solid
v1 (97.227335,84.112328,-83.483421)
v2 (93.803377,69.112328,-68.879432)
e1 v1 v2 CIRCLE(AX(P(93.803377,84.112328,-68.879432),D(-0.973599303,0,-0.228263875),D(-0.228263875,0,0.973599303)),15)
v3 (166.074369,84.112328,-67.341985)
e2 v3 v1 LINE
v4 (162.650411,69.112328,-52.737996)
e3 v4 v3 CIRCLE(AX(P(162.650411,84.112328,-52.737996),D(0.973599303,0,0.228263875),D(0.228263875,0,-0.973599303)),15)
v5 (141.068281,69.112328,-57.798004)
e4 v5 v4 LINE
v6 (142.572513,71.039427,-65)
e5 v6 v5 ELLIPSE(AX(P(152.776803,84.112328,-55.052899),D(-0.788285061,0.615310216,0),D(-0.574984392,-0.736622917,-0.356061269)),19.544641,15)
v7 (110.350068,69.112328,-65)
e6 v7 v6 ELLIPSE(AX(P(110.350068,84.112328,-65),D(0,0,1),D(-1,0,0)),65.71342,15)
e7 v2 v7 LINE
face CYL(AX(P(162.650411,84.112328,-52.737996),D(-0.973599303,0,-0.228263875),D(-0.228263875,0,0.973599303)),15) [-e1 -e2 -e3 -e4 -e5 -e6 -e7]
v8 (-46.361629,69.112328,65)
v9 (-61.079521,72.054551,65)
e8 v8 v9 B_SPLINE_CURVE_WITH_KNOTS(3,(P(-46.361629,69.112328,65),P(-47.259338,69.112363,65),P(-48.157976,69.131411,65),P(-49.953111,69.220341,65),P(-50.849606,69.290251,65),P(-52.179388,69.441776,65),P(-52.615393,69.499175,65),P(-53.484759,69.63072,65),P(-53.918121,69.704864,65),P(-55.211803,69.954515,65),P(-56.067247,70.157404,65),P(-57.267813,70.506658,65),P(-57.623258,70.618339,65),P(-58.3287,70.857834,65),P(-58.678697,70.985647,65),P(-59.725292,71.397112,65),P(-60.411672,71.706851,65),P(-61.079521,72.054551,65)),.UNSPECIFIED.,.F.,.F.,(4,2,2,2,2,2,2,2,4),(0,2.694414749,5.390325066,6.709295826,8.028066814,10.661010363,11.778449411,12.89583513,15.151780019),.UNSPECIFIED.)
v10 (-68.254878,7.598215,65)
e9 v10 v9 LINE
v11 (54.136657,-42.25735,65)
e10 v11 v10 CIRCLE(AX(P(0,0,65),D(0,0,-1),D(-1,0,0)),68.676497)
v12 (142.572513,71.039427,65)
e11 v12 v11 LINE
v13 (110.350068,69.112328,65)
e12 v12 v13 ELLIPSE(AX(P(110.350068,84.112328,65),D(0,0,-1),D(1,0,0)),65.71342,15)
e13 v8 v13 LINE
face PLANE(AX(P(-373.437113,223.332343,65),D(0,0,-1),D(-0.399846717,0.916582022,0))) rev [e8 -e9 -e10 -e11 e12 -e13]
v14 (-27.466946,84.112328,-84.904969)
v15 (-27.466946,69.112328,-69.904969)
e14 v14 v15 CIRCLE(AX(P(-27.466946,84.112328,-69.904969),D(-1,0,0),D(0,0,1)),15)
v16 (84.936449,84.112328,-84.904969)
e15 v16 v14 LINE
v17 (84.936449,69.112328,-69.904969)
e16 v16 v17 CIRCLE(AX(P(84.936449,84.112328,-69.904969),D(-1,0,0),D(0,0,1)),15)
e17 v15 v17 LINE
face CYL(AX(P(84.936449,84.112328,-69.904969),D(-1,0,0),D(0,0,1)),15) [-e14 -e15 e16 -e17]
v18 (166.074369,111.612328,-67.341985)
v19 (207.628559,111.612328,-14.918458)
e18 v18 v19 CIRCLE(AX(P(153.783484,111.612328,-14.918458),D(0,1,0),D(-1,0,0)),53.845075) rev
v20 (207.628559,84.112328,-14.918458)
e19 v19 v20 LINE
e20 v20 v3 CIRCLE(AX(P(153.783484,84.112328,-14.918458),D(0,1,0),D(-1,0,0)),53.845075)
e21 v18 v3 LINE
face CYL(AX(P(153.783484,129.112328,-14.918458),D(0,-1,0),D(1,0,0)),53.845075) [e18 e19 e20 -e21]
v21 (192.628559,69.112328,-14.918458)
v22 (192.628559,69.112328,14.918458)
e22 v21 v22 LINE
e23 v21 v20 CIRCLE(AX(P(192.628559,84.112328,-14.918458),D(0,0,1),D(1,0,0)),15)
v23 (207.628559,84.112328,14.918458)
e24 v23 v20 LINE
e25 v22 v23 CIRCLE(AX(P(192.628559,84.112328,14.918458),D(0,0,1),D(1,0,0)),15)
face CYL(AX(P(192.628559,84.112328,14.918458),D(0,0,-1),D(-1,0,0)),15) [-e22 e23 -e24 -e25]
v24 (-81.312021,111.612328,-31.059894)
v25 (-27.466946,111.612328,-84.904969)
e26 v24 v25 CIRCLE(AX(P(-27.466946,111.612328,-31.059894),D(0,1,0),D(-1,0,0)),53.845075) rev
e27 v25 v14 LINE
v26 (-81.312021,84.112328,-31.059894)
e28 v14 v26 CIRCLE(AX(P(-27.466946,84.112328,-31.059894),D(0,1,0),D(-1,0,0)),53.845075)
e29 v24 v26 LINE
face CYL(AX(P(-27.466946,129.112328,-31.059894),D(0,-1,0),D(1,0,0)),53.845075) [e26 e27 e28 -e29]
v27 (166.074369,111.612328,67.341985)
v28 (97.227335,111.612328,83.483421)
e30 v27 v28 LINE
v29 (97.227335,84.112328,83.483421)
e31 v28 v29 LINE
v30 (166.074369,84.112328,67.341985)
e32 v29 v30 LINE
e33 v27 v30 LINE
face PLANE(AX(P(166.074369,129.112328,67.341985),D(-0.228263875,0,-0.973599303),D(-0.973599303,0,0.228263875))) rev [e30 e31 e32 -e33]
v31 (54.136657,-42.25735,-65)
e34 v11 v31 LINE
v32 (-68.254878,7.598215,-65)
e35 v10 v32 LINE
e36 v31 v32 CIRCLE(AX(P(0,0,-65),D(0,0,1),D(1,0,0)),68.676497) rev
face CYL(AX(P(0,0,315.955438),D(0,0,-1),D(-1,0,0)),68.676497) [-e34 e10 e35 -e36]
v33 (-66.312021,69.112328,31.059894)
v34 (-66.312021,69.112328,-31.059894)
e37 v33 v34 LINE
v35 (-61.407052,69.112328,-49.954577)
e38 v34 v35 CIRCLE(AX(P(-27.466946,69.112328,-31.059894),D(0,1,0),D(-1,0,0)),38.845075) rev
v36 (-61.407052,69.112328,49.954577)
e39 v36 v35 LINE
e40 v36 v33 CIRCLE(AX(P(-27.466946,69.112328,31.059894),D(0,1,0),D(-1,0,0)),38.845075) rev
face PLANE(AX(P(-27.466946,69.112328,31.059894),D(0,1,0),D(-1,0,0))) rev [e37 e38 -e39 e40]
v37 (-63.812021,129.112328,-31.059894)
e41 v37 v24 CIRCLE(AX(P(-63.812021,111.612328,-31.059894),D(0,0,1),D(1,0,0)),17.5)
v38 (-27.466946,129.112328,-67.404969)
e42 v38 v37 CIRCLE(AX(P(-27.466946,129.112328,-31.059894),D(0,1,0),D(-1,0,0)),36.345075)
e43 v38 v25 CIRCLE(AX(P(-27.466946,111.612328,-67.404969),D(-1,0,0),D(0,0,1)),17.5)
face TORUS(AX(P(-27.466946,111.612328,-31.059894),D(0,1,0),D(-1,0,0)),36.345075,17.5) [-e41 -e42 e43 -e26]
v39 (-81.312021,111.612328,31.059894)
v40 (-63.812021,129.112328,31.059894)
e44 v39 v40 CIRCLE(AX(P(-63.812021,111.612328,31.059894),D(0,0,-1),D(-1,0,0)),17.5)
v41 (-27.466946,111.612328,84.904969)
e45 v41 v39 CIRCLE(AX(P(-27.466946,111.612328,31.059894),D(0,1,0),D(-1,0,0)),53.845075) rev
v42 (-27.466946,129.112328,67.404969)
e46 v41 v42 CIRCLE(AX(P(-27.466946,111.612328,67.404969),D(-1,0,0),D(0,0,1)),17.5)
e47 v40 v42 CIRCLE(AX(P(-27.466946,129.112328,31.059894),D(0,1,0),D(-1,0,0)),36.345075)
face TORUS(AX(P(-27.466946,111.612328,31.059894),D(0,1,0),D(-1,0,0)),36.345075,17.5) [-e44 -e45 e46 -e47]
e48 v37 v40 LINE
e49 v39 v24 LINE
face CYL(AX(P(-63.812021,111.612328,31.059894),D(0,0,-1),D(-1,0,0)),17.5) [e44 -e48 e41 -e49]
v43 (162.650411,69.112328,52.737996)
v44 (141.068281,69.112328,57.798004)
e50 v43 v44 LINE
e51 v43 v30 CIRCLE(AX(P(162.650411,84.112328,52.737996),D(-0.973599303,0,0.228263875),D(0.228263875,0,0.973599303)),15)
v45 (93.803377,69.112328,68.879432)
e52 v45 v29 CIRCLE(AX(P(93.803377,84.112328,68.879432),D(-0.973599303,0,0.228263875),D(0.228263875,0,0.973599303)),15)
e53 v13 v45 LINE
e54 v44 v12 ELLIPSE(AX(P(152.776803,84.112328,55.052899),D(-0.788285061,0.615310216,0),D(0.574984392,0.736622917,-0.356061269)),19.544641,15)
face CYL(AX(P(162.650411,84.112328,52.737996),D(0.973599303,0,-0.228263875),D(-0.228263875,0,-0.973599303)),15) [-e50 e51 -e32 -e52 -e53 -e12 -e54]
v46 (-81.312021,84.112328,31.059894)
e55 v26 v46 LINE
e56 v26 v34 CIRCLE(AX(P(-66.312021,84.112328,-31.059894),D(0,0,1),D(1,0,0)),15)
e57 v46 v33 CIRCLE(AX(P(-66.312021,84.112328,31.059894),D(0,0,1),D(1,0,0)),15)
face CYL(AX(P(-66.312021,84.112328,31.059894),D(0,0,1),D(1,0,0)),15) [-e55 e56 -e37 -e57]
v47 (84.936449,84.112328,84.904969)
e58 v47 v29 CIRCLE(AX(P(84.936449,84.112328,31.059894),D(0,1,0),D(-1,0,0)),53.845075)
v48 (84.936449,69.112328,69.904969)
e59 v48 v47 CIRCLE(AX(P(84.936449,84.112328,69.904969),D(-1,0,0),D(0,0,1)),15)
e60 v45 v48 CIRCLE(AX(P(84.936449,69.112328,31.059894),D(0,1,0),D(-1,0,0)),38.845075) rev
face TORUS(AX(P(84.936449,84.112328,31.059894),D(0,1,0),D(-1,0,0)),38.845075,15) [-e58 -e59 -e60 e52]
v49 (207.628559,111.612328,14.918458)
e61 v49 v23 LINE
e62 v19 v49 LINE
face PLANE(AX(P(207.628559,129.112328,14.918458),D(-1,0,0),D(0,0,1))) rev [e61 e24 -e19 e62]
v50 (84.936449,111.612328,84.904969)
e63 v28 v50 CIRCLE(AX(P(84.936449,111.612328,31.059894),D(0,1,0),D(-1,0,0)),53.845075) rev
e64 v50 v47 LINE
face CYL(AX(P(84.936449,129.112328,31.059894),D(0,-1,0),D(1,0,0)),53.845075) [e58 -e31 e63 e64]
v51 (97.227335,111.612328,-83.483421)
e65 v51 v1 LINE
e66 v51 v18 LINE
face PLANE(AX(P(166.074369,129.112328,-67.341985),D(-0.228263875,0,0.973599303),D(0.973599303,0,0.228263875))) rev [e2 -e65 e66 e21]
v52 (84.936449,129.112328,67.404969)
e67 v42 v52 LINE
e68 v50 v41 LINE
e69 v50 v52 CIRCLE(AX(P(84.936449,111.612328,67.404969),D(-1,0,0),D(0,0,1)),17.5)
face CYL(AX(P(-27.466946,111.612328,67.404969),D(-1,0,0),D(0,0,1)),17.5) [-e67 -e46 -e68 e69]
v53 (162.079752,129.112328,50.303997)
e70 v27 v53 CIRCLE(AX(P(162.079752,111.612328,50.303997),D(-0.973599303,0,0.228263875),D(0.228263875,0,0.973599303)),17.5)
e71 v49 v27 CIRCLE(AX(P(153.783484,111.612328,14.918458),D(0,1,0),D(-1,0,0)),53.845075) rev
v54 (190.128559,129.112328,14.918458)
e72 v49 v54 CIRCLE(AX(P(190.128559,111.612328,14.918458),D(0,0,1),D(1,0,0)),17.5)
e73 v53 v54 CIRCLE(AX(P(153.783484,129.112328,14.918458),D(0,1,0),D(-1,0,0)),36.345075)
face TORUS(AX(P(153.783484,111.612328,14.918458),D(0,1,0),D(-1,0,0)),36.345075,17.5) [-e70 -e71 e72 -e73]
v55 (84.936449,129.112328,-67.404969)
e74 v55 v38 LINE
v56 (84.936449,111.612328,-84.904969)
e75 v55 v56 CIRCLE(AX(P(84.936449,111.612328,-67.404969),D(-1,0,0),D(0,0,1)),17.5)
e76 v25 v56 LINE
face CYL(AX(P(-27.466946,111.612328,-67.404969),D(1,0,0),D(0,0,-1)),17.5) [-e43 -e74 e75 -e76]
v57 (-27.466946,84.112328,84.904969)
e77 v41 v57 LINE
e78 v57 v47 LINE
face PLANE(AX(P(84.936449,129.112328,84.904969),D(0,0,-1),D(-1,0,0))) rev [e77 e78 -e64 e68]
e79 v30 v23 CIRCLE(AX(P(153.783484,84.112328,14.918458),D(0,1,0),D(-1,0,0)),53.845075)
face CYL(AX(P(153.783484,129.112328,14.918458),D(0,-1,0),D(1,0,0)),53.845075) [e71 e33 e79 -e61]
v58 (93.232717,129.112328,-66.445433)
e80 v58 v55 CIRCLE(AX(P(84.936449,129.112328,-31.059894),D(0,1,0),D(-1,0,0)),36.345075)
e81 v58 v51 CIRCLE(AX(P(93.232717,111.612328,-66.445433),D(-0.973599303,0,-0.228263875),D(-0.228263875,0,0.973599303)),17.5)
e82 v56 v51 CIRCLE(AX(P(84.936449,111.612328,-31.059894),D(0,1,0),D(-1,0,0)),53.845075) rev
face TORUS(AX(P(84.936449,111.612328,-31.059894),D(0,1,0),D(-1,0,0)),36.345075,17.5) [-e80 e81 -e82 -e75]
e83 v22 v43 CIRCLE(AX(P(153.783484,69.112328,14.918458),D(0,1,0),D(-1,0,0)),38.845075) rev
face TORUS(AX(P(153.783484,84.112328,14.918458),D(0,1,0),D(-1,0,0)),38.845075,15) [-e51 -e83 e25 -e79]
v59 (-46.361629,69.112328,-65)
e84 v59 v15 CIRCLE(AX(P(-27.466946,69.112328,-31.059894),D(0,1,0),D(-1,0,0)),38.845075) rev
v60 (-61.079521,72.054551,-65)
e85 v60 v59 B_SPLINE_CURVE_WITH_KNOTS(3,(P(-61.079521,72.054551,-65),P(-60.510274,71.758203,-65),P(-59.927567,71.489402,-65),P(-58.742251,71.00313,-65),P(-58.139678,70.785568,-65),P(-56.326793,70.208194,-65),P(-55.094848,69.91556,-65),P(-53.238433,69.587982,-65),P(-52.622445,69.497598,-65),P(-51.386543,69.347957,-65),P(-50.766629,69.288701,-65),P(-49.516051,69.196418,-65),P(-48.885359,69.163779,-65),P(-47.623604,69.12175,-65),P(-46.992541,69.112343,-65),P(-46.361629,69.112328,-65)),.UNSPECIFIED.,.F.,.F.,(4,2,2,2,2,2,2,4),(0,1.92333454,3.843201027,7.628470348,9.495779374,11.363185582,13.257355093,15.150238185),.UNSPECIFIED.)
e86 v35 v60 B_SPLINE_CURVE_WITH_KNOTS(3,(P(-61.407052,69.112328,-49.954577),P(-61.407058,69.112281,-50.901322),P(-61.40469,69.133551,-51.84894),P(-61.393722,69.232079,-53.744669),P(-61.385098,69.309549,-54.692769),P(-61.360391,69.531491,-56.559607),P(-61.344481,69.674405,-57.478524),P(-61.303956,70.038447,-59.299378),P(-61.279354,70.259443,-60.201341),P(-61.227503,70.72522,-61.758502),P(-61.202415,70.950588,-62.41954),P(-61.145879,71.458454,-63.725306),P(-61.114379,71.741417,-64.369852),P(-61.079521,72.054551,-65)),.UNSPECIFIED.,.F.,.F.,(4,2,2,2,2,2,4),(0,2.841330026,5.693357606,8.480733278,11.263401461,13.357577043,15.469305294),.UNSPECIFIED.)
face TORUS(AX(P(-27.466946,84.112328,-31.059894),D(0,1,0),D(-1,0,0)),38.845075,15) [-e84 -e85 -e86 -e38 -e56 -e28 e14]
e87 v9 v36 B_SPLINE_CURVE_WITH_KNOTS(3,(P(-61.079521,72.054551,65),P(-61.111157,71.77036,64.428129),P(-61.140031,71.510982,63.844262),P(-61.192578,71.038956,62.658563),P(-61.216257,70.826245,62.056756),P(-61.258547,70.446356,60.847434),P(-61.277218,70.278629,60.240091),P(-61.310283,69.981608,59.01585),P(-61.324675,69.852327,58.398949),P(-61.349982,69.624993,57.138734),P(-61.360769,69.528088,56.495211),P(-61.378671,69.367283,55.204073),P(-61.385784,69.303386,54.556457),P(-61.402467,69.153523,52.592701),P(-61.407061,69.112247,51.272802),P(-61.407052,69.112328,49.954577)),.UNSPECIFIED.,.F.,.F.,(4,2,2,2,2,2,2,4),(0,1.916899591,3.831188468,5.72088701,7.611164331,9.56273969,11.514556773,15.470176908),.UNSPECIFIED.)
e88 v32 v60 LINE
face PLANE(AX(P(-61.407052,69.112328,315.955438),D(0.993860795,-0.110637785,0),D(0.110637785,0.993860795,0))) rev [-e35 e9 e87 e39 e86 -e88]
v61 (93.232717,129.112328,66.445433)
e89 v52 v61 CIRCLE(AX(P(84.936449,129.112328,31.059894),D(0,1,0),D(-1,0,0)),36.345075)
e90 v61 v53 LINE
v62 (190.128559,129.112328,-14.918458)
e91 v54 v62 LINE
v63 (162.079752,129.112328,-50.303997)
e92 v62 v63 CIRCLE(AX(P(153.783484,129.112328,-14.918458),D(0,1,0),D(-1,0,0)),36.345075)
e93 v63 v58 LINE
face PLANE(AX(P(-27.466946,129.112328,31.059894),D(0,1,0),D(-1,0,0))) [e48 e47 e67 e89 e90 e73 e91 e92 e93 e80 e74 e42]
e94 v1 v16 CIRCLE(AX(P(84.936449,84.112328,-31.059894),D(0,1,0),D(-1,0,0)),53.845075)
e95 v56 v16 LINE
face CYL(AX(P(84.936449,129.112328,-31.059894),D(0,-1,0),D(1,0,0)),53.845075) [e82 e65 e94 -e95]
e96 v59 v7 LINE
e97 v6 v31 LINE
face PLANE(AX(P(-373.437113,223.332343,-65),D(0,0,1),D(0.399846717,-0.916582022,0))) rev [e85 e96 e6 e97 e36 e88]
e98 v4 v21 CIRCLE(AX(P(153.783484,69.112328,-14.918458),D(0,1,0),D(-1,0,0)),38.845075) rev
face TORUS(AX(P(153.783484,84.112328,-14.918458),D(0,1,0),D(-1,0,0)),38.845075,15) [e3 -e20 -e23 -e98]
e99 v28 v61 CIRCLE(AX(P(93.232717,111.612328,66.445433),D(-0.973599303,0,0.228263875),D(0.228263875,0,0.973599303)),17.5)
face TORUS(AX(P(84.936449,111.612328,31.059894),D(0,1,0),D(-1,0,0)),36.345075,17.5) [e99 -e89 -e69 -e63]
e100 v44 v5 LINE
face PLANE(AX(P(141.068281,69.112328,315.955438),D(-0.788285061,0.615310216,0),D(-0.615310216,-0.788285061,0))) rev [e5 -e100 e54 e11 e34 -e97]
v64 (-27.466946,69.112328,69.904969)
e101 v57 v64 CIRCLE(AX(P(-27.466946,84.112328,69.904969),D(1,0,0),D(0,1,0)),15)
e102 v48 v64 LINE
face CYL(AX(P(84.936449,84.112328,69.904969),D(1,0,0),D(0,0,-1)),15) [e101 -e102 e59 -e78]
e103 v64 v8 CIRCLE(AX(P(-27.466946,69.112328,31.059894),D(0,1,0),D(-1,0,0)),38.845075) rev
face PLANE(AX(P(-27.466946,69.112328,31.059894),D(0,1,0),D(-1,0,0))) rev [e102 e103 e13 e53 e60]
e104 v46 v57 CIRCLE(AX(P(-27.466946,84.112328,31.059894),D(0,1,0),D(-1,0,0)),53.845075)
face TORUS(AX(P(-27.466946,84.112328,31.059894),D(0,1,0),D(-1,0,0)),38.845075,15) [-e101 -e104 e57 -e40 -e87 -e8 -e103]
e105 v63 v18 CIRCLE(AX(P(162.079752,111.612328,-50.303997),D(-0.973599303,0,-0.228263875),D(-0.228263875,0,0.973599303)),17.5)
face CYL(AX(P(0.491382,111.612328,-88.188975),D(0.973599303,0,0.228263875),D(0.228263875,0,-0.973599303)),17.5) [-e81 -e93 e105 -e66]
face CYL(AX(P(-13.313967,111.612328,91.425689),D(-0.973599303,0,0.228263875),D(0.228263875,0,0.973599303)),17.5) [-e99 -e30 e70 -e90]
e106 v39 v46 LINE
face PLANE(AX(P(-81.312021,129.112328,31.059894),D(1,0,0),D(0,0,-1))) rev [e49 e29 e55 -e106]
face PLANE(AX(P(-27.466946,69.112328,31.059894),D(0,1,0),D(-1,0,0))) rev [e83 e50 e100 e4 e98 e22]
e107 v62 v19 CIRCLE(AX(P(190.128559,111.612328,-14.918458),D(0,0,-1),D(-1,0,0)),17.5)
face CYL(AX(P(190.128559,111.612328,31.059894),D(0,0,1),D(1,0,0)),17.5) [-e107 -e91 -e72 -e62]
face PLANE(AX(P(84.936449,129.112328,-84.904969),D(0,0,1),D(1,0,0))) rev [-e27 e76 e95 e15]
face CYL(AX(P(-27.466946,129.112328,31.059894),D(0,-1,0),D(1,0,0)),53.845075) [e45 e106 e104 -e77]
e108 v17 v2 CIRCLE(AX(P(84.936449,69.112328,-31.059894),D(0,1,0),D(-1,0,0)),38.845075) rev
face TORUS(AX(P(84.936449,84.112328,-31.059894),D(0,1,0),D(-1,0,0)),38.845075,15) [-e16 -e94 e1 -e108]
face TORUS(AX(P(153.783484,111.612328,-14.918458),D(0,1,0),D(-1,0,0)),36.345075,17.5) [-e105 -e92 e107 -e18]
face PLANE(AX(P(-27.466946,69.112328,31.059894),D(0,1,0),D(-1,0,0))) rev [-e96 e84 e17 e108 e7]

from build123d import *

# Parameters (mm, degrees)
GRIPPER_BLOCK_EXTRUDE_DEPTH      = 65
GRIPPER_BLOCK_EXTRUDE_DEPTH_BACK = 65
GRIPPER_PAD_EXTRUDE_DEPTH        = 60
FILLET1_R                        = 15
FILLET2_R                        = 17.5


with BuildPart() as part:
    # Gripper Block Sketch → Gripper Block Extrude (new, two sides: drawn at the far end of the back side and taken through both)
    with BuildSketch(Plane.XY.offset(-GRIPPER_BLOCK_EXTRUDE_DEPTH_BACK)):
        with BuildLine():
            Line((-61.407052481, 69.112327645), (141.068280517, 69.112327645))
            Line((141.068280517, 69.112327645), (54.136656509, -42.257350137))
            ThreePointArc((54.136656509, -42.257350137), (-25.908018032, -63.602168361), (-68.254877777, 7.598215467))
            Line((-68.254877777, 7.598215467), (-61.407052481, 69.112327645))
        make_face()
    extrude(amount=GRIPPER_BLOCK_EXTRUDE_DEPTH + GRIPPER_BLOCK_EXTRUDE_DEPTH_BACK)

    # Gripper Pad Sketch → Gripper Pad Extrude (add)
    with BuildSketch(Plane(origin=(0, 69.112327645, 0), x_dir=(1, 0, 0), z_dir=(0, 1, 0))):
        with BuildLine():
            Line((207.628558986, -14.918457632), (207.628558986, 14.918457632))
            ThreePointArc((207.628558986, 14.918457632), (195.980022657, 48.366091724), (166.074369452, 67.341985153))
            Line((166.074369452, 67.341985153), (97.227334679, 83.483421268))
            ThreePointArc((97.227334679, 83.483421268), (91.122858963, 84.548401278), (84.936449194, 84.904968765))
            Line((84.936449194, 84.904968765), (-27.466946228, 84.904968765))
            ThreePointArc((-27.466946228, 84.904968765), (-65.541163907, 69.134111426), (-81.312021247, 31.059893746))
            Line((-81.312021247, 31.059893746), (-81.312021247, -31.059893746))
            ThreePointArc((-81.312021247, -31.059893746), (-65.541163907, -69.134111426), (-27.466946228, -84.904968765))
            Line((-27.466946228, -84.904968765), (84.936449194, -84.904968765))
            ThreePointArc((84.936449194, -84.904968765), (91.122858963, -84.548401278), (97.227334679, -83.483421268))
            Line((97.227334679, -83.483421268), (166.074369452, -67.341985153))
            ThreePointArc((166.074369452, -67.341985153), (195.980022657, -48.366091724), (207.628558986, -14.918457632))
        make_face()
    extrude(amount=GRIPPER_PAD_EXTRUDE_DEPTH)

    # Fillet1
    # the kernel refuses this fillet: 15 mm, written as the material it takes off along each edge
    with BuildSketch(Plane(origin=(-27.466946228, 69.112327645, 31.059893746), x_dir=(-1, 0, 0), z_dir=(0, 0, -1))) as fillet1_piece_1_section:
        with BuildLine():
            CenterArc((53.845075019 - FILLET1_R, FILLET1_R), FILLET1_R, 270, 90)
            Line((53.845075019, FILLET1_R), (53.845075019, 0))
            Line((53.845075019, 0), (53.845075019 - FILLET1_R, 0))
        make_face()
    fillet1_piece_1 = revolve(axis=Axis((-27.466946228, 69.112327645, 31.059893746), (0, 1, 0)), revolution_arc=90, mode=Mode.PRIVATE)
    fillet1_piece_1 = split(fillet1_piece_1, bisect_by=Plane(origin=(-73.84979, 72.577751754, 65), z_dir=(0, 0, -1)), keep=Keep.TOP, mode=Mode.PRIVATE)
    fillet1_piece_1 = split(fillet1_piece_1, bisect_by=Plane(origin=(-61.178307507, 71.167147012, 48.44878025), z_dir=(-0.9938607953898665, 0.1106377846263296, 0)), keep=Keep.TOP, mode=Mode.PRIVATE)
    add(fillet1_piece_1, mode=Mode.SUBTRACT)
    with BuildSketch(Plane(origin=(-27.466946228, 69.112327645, 31.059893746), x_dir=(-1, 0, 0), z_dir=(0, 0, -1))) as fillet1_piece_2_section:
        with BuildLine():
            CenterArc((53.845075019 - FILLET1_R, FILLET1_R), FILLET1_R, 270, 90)
            Line((53.845075019, FILLET1_R), (53.845075019, 0))
            Line((53.845075019, 0), (53.845075019 - FILLET1_R, 0))
        make_face()
    fillet1_piece_2 = revolve(axis=Axis((-27.466946228, 69.112327645, 31.059893746), (0, 1, 0)), revolution_arc=90, mode=Mode.PRIVATE)
    fillet1_piece_2 = split(fillet1_piece_2, bisect_by=Plane(origin=(-64.322526984, 74.085740729, 65), z_dir=(0, 0, 1)), keep=Keep.TOP, mode=Mode.PRIVATE)
    fillet1_piece_2 = split(fillet1_piece_2, bisect_by=Plane(origin=(-60.895870662, 73.704281207, 68.420730392), z_dir=(-0.9938607953898665, 0.1106377846263296, 0)), keep=Keep.TOP, mode=Mode.PRIVATE)
    add(fillet1_piece_2, mode=Mode.SUBTRACT)
    with BuildSketch(Plane(origin=(-27.466946228, 69.112327645, 31.059893746), x_dir=(-1, 0, 0), z_dir=(0, 0, -1))) as fillet1_piece_3_section:
        with BuildLine():
            CenterArc((53.845075019 - FILLET1_R, FILLET1_R), FILLET1_R, 270, 90)
            Line((53.845075019, FILLET1_R), (53.845075019, 0))
            Line((53.845075019, 0), (53.845075019 - FILLET1_R, 0))
        make_face()
    fillet1_piece_3 = revolve(axis=Axis((-27.466946228, 69.112327645, 31.059893746), (0, 1, 0)), revolution_arc=90, mode=Mode.PRIVATE)
    fillet1_piece_3 = split(fillet1_piece_3, bisect_by=Plane(origin=(-44.631950022, 72.537046156, 65), z_dir=(0, 0, 1)), keep=Keep.TOP, mode=Mode.PRIVATE)
    fillet1_piece_3 = split(fillet1_piece_3, bisect_by=Plane(origin=(-60.825136055, 74.339691191, 77.53132991), z_dir=(0.9938607953898665, -0.1106377846263296, 0)), keep=Keep.TOP, mode=Mode.PRIVATE)
    add(fillet1_piece_3, mode=Mode.SUBTRACT)
    with BuildSketch(Plane(origin=(-27.466946228, 69.112327645, 84.904968765), x_dir=(0, 0, -1), z_dir=(1, 0, 0)), Plane(origin=(84.936449194, 69.112327645, -84.904968765), x_dir=(0, 0, 1), z_dir=(-1, 0, 0))) as fillet1_piece_4:
        with BuildLine():
            CenterArc((FILLET1_R, FILLET1_R), FILLET1_R, 180, 90)
            Line((0, FILLET1_R), (0, 0))
            Line((0, 0), (FILLET1_R, 0))
        make_face()
    extrude(amount=112.403395422, mode=Mode.SUBTRACT)
    with BuildSketch(Plane(origin=(84.936449194, 69.112327645, 31.059893746), x_dir=(0, 0, 1), z_dir=(-1, 0, 0))) as fillet1_piece_5:
        with BuildLine():
            CenterArc((53.845075019 - FILLET1_R, FILLET1_R), FILLET1_R, 270, 90)
            Line((53.845075019, FILLET1_R), (53.845075019, 0))
            Line((53.845075019, 0), (53.845075019 - FILLET1_R, 0))
        make_face()
    revolve(axis=Axis((84.936449194, 69.112327645, 31.059893746), (0, 1, 0)), revolution_arc=13.194880345, mode=Mode.SUBTRACT)
    with BuildSketch(Plane(origin=(97.227334679, 69.112327645, 83.483421268), x_dir=(-0.22826387521668148, 0, -0.9735993032408473), z_dir=(0.9735993032408473, 0, -0.22826387521668148))) as fillet1_piece_6_section:
        with BuildLine():
            CenterArc((FILLET1_R, FILLET1_R), FILLET1_R, 180, 90)
            Line((0, FILLET1_R), (0, 0))
            Line((0, 0), (FILLET1_R, 0))
        make_face()
    fillet1_piece_6 = extrude(amount=70.713931844, mode=Mode.PRIVATE)
    fillet1_piece_6 = split(fillet1_piece_6, bisect_by=Plane(origin=(119.836470057, 72.733873608, 65), z_dir=(0, 0, 1)), keep=Keep.TOP, mode=Mode.PRIVATE)
    fillet1_piece_6 = split(fillet1_piece_6, bisect_by=Plane(origin=(134.786369737, 61.064457984, 74.954099128), z_dir=(-0.7882850610871249, 0.6153102164492865, 0)), keep=Keep.TOP, mode=Mode.PRIVATE)
    add(fillet1_piece_6, mode=Mode.SUBTRACT)
    with BuildSketch(Plane(origin=(97.227334679, 69.112327645, 83.483421268), x_dir=(-0.22826387521668148, 0, -0.9735993032408473), z_dir=(0.9735993032408473, 0, -0.22826387521668148))) as fillet1_piece_7_section:
        with BuildLine():
            CenterArc((FILLET1_R, FILLET1_R), FILLET1_R, 180, 90)
            Line((0, FILLET1_R), (0, 0))
            Line((0, 0), (FILLET1_R, 0))
        make_face()
    fillet1_piece_7 = extrude(amount=70.713931844, mode=Mode.PRIVATE)
    fillet1_piece_7 = split(fillet1_piece_7, bisect_by=Plane(origin=(153.801497728, 73.000872284, 65), z_dir=(0, 0, 1)), keep=Keep.TOP, mode=Mode.PRIVATE)
    fillet1_piece_7 = split(fillet1_piece_7, bisect_by=Plane(origin=(147.775260503, 77.704761162, 68.23623244), z_dir=(0.7882850610871249, -0.6153102164492865, 0)), keep=Keep.TOP, mode=Mode.PRIVATE)
    add(fillet1_piece_7, mode=Mode.SUBTRACT)
    with BuildSketch(Plane(origin=(97.227334679, 69.112327645, 83.483421268), x_dir=(-0.22826387521668148, 0, -0.9735993032408473), z_dir=(0.9735993032408473, 0, -0.22826387521668148))) as fillet1_piece_8_section:
        with BuildLine():
            CenterArc((FILLET1_R, FILLET1_R), FILLET1_R, 180, 90)
            Line((0, FILLET1_R), (0, 0))
            Line((0, 0), (FILLET1_R, 0))
        make_face()
    fillet1_piece_8 = extrude(amount=70.713931844, mode=Mode.PRIVATE)
    fillet1_piece_8 = split(fillet1_piece_8, bisect_by=Plane(origin=(155.820732403, 70.160373086, 65), z_dir=(0, 0, -1)), keep=Keep.TOP, mode=Mode.PRIVATE)
    fillet1_piece_8 = split(fillet1_piece_8, bisect_by=Plane(origin=(147.162000894, 76.919103172, 62.047586318), z_dir=(0.7882850610871249, -0.6153102164492865, 0)), keep=Keep.TOP, mode=Mode.PRIVATE)
    add(fillet1_piece_8, mode=Mode.SUBTRACT)
    with BuildSketch(Plane(origin=(153.783483967, 69.112327645, 14.918457632), x_dir=(0.22826387521668226, 0, 0.973599303240847), z_dir=(-0.973599303240847, 0, 0.22826387521668226))) as fillet1_piece_9:
        with BuildLine():
            CenterArc((53.845075019 - FILLET1_R, FILLET1_R), FILLET1_R, 270, 90)
            Line((53.845075019 - FILLET1_R, 0), (53.845075019, 0))
            Line((53.845075019, 0), (53.845075019, FILLET1_R))
        make_face()
    revolve(axis=Axis((153.783483967, 69.112327645, 14.918457632), (0, 1, 0)), revolution_arc=76.805119655, mode=Mode.SUBTRACT)
    with BuildSketch(Plane(origin=(207.628558986, 69.112327645, 14.918457632), x_dir=(0, 1, 0), z_dir=(0, 0, -1))) as fillet1_piece_10:
        with BuildLine():
            CenterArc((FILLET1_R, -FILLET1_R), FILLET1_R, 90, 90)
            Line((0, -FILLET1_R), (0, 0))
            Line((0, 0), (FILLET1_R, 0))
        make_face()
    extrude(amount=29.836915263, mode=Mode.SUBTRACT)
    with BuildSketch(Plane(origin=(153.783483967, 69.112327645, -14.918457632), x_dir=(1, 0, 0), z_dir=(0, 0, 1))) as fillet1_piece_11:
        with BuildLine():
            CenterArc((53.845075019 - FILLET1_R, FILLET1_R), FILLET1_R, 270, 90)
            Line((53.845075019 - FILLET1_R, 0), (53.845075019, 0))
            Line((53.845075019, 0), (53.845075019, FILLET1_R))
        make_face()
    revolve(axis=Axis((153.783483967, 69.112327645, -14.918457632), (0, 1, 0)), revolution_arc=76.805119655, mode=Mode.SUBTRACT)
    with BuildSketch(Plane(origin=(166.074369452, 69.112327645, -67.341985153), x_dir=(-0.22826387521668007, 0, 0.9735993032408475), z_dir=(-0.9735993032408476, 0, -0.2282638752166801))) as fillet1_piece_12_section:
        with BuildLine():
            CenterArc((FILLET1_R, FILLET1_R), FILLET1_R, 180, 90)
            Line((0, FILLET1_R), (0, 0))
            Line((0, 0), (FILLET1_R, 0))
        make_face()
    fillet1_piece_12 = extrude(amount=70.713931844, mode=Mode.PRIVATE)
    fillet1_piece_12 = split(fillet1_piece_12, bisect_by=Plane(origin=(147.162000894, 76.919103172, -62.047586318), z_dir=(0.7882850610871249, -0.6153102164492865, 0)), keep=Keep.TOP, mode=Mode.PRIVATE)
    fillet1_piece_12 = split(fillet1_piece_12, bisect_by=Plane(origin=(155.820732403, 70.160373086, -65), z_dir=(0, 0, 1)), keep=Keep.TOP, mode=Mode.PRIVATE)
    add(fillet1_piece_12, mode=Mode.SUBTRACT)
    with BuildSketch(Plane(origin=(166.074369452, 69.112327645, -67.341985153), x_dir=(-0.22826387521668007, 0, 0.9735993032408475), z_dir=(-0.9735993032408476, 0, -0.2282638752166801))) as fillet1_piece_13_section:
        with BuildLine():
            CenterArc((FILLET1_R, FILLET1_R), FILLET1_R, 180, 90)
            Line((0, FILLET1_R), (0, 0))
            Line((0, 0), (FILLET1_R, 0))
        make_face()
    fillet1_piece_13 = extrude(amount=70.713931844, mode=Mode.PRIVATE)
    fillet1_piece_13 = split(fillet1_piece_13, bisect_by=Plane(origin=(147.775260503, 77.704761162, -68.23623244), z_dir=(0.7882850610871249, -0.6153102164492865, 0)), keep=Keep.TOP, mode=Mode.PRIVATE)
    fillet1_piece_13 = split(fillet1_piece_13, bisect_by=Plane(origin=(153.801497728, 73.000872284, -65), z_dir=(0, 0, -1)), keep=Keep.TOP, mode=Mode.PRIVATE)
    add(fillet1_piece_13, mode=Mode.SUBTRACT)
    with BuildSketch(Plane(origin=(166.074369452, 69.112327645, -67.341985153), x_dir=(-0.22826387521668007, 0, 0.9735993032408475), z_dir=(-0.9735993032408476, 0, -0.2282638752166801))) as fillet1_piece_14_section:
        with BuildLine():
            CenterArc((FILLET1_R, FILLET1_R), FILLET1_R, 180, 90)
            Line((0, FILLET1_R), (0, 0))
            Line((0, 0), (FILLET1_R, 0))
        make_face()
    fillet1_piece_14 = extrude(amount=70.713931844, mode=Mode.PRIVATE)
    fillet1_piece_14 = split(fillet1_piece_14, bisect_by=Plane(origin=(134.786369737, 61.064457984, -74.954099128), z_dir=(-0.7882850610871249, 0.6153102164492865, 0)), keep=Keep.TOP, mode=Mode.PRIVATE)
    fillet1_piece_14 = split(fillet1_piece_14, bisect_by=Plane(origin=(119.836470057, 72.733873608, -65), z_dir=(0, 0, -1)), keep=Keep.TOP, mode=Mode.PRIVATE)
    add(fillet1_piece_14, mode=Mode.SUBTRACT)
    with BuildSketch(Plane(origin=(84.936449194, 69.112327645, -31.059893746), x_dir=(0.22826387521668692, 0, -0.973599303240846), z_dir=(0.973599303240846, 0, 0.22826387521668692))) as fillet1_piece_15:
        with BuildLine():
            CenterArc((53.845075019 - FILLET1_R, FILLET1_R), FILLET1_R, 270, 90)
            Line((53.845075019, FILLET1_R), (53.845075019, 0))
            Line((53.845075019, 0), (53.845075019 - FILLET1_R, 0))
        make_face()
    revolve(axis=Axis((84.936449194, 69.112327645, -31.059893746), (0, 1, 0)), revolution_arc=13.194880345, mode=Mode.SUBTRACT)
    with BuildSketch(Plane(origin=(-27.466946228, 69.112327645, -31.059893746), x_dir=(0, 0, -1), z_dir=(1, 0, 0))) as fillet1_piece_16_section:
        with BuildLine():
            CenterArc((53.845075019 - FILLET1_R, FILLET1_R), FILLET1_R, 270, 90)
            Line((53.845075019, FILLET1_R), (53.845075019, 0))
            Line((53.845075019, 0), (53.845075019 - FILLET1_R, 0))
        make_face()
    fillet1_piece_16 = revolve(axis=Axis((-27.466946228, 69.112327645, -31.059893746), (0, 1, 0)), revolution_arc=90, mode=Mode.PRIVATE)
    fillet1_piece_16 = split(fillet1_piece_16, bisect_by=Plane(origin=(-44.631949939, 72.537046047, -65), z_dir=(0, 0, -1)), keep=Keep.TOP, mode=Mode.PRIVATE)
    fillet1_piece_16 = split(fillet1_piece_16, bisect_by=Plane(origin=(-60.825136066, 74.339691093, -77.531329935), z_dir=(0.9938607953898665, -0.1106377846263296, 0)), keep=Keep.TOP, mode=Mode.PRIVATE)
    add(fillet1_piece_16, mode=Mode.SUBTRACT)
    with BuildSketch(Plane(origin=(-27.466946228, 69.112327645, -31.059893746), x_dir=(0, 0, -1), z_dir=(1, 0, 0))) as fillet1_piece_17_section:
        with BuildLine():
            CenterArc((53.845075019 - FILLET1_R, FILLET1_R), FILLET1_R, 270, 90)
            Line((53.845075019, FILLET1_R), (53.845075019, 0))
            Line((53.845075019, 0), (53.845075019 - FILLET1_R, 0))
        make_face()
    fillet1_piece_17 = revolve(axis=Axis((-27.466946228, 69.112327645, -31.059893746), (0, 1, 0)), revolution_arc=90, mode=Mode.PRIVATE)
    fillet1_piece_17 = split(fillet1_piece_17, bisect_by=Plane(origin=(-64.322526993, 74.085740732, -65), z_dir=(0, 0, -1)), keep=Keep.TOP, mode=Mode.PRIVATE)
    fillet1_piece_17 = split(fillet1_piece_17, bisect_by=Plane(origin=(-60.895870662, 73.704281209, -68.420730393), z_dir=(-0.9938607953898665, 0.1106377846263296, 0)), keep=Keep.TOP, mode=Mode.PRIVATE)
    add(fillet1_piece_17, mode=Mode.SUBTRACT)
    with BuildSketch(Plane(origin=(-27.466946228, 69.112327645, -31.059893746), x_dir=(0, 0, -1), z_dir=(1, 0, 0))) as fillet1_piece_18_section:
        with BuildLine():
            CenterArc((53.845075019 - FILLET1_R, FILLET1_R), FILLET1_R, 270, 90)
            Line((53.845075019, FILLET1_R), (53.845075019, 0))
            Line((53.845075019, 0), (53.845075019 - FILLET1_R, 0))
        make_face()
    fillet1_piece_18 = revolve(axis=Axis((-27.466946228, 69.112327645, -31.059893746), (0, 1, 0)), revolution_arc=90, mode=Mode.PRIVATE)
    fillet1_piece_18 = split(fillet1_piece_18, bisect_by=Plane(origin=(-73.849789794, 72.577752581, -65), z_dir=(0, 0, 1)), keep=Keep.TOP, mode=Mode.PRIVATE)
    fillet1_piece_18 = split(fillet1_piece_18, bisect_by=Plane(origin=(-61.178307413, 71.167147852, -48.448780612), z_dir=(-0.9938607953898665, 0.1106377846263296, 0)), keep=Keep.TOP, mode=Mode.PRIVATE)
    add(fillet1_piece_18, mode=Mode.SUBTRACT)
    with BuildSketch(Plane(origin=(-81.312021247, 69.112327645, -31.059893746), x_dir=(1, 0, 0), z_dir=(0, 0, 1))) as fillet1_piece_19:
        with BuildLine():
            CenterArc((FILLET1_R, FILLET1_R), FILLET1_R, 180, 90)
            Line((0, FILLET1_R), (0, 0))
            Line((0, 0), (FILLET1_R, 0))
        make_face()
    extrude(amount=62.119787492, mode=Mode.SUBTRACT)

    # Fillet2
    fillet2_edges = [part.edges().sort_by_distance(p)[0] for p in [
        (-65.541163907, 129.112327645, 69.134111426),
        (28.734751483, 129.112327645, 84.904968765),
        (91.122858963, 129.112327645, 84.548401278),
        (131.650852066, 129.112327645, 75.412703211),
        (195.980022657, 129.112327645, 48.366091724),
        (207.628558986, 129.112327645, 0),
        (195.980022657, 129.112327645, -48.366091724),
        (131.650852066, 129.112327645, -75.412703211),
        (91.122858963, 129.112327645, -84.548401278),
        (28.734751483, 129.112327645, -84.904968765),
        (-65.541163907, 129.112327645, -69.134111426),
        (-81.312021247, 129.112327645, 0),
    ]]
    fillet(fillet2_edges, radius=FILLET2_R)


solid = part.part
